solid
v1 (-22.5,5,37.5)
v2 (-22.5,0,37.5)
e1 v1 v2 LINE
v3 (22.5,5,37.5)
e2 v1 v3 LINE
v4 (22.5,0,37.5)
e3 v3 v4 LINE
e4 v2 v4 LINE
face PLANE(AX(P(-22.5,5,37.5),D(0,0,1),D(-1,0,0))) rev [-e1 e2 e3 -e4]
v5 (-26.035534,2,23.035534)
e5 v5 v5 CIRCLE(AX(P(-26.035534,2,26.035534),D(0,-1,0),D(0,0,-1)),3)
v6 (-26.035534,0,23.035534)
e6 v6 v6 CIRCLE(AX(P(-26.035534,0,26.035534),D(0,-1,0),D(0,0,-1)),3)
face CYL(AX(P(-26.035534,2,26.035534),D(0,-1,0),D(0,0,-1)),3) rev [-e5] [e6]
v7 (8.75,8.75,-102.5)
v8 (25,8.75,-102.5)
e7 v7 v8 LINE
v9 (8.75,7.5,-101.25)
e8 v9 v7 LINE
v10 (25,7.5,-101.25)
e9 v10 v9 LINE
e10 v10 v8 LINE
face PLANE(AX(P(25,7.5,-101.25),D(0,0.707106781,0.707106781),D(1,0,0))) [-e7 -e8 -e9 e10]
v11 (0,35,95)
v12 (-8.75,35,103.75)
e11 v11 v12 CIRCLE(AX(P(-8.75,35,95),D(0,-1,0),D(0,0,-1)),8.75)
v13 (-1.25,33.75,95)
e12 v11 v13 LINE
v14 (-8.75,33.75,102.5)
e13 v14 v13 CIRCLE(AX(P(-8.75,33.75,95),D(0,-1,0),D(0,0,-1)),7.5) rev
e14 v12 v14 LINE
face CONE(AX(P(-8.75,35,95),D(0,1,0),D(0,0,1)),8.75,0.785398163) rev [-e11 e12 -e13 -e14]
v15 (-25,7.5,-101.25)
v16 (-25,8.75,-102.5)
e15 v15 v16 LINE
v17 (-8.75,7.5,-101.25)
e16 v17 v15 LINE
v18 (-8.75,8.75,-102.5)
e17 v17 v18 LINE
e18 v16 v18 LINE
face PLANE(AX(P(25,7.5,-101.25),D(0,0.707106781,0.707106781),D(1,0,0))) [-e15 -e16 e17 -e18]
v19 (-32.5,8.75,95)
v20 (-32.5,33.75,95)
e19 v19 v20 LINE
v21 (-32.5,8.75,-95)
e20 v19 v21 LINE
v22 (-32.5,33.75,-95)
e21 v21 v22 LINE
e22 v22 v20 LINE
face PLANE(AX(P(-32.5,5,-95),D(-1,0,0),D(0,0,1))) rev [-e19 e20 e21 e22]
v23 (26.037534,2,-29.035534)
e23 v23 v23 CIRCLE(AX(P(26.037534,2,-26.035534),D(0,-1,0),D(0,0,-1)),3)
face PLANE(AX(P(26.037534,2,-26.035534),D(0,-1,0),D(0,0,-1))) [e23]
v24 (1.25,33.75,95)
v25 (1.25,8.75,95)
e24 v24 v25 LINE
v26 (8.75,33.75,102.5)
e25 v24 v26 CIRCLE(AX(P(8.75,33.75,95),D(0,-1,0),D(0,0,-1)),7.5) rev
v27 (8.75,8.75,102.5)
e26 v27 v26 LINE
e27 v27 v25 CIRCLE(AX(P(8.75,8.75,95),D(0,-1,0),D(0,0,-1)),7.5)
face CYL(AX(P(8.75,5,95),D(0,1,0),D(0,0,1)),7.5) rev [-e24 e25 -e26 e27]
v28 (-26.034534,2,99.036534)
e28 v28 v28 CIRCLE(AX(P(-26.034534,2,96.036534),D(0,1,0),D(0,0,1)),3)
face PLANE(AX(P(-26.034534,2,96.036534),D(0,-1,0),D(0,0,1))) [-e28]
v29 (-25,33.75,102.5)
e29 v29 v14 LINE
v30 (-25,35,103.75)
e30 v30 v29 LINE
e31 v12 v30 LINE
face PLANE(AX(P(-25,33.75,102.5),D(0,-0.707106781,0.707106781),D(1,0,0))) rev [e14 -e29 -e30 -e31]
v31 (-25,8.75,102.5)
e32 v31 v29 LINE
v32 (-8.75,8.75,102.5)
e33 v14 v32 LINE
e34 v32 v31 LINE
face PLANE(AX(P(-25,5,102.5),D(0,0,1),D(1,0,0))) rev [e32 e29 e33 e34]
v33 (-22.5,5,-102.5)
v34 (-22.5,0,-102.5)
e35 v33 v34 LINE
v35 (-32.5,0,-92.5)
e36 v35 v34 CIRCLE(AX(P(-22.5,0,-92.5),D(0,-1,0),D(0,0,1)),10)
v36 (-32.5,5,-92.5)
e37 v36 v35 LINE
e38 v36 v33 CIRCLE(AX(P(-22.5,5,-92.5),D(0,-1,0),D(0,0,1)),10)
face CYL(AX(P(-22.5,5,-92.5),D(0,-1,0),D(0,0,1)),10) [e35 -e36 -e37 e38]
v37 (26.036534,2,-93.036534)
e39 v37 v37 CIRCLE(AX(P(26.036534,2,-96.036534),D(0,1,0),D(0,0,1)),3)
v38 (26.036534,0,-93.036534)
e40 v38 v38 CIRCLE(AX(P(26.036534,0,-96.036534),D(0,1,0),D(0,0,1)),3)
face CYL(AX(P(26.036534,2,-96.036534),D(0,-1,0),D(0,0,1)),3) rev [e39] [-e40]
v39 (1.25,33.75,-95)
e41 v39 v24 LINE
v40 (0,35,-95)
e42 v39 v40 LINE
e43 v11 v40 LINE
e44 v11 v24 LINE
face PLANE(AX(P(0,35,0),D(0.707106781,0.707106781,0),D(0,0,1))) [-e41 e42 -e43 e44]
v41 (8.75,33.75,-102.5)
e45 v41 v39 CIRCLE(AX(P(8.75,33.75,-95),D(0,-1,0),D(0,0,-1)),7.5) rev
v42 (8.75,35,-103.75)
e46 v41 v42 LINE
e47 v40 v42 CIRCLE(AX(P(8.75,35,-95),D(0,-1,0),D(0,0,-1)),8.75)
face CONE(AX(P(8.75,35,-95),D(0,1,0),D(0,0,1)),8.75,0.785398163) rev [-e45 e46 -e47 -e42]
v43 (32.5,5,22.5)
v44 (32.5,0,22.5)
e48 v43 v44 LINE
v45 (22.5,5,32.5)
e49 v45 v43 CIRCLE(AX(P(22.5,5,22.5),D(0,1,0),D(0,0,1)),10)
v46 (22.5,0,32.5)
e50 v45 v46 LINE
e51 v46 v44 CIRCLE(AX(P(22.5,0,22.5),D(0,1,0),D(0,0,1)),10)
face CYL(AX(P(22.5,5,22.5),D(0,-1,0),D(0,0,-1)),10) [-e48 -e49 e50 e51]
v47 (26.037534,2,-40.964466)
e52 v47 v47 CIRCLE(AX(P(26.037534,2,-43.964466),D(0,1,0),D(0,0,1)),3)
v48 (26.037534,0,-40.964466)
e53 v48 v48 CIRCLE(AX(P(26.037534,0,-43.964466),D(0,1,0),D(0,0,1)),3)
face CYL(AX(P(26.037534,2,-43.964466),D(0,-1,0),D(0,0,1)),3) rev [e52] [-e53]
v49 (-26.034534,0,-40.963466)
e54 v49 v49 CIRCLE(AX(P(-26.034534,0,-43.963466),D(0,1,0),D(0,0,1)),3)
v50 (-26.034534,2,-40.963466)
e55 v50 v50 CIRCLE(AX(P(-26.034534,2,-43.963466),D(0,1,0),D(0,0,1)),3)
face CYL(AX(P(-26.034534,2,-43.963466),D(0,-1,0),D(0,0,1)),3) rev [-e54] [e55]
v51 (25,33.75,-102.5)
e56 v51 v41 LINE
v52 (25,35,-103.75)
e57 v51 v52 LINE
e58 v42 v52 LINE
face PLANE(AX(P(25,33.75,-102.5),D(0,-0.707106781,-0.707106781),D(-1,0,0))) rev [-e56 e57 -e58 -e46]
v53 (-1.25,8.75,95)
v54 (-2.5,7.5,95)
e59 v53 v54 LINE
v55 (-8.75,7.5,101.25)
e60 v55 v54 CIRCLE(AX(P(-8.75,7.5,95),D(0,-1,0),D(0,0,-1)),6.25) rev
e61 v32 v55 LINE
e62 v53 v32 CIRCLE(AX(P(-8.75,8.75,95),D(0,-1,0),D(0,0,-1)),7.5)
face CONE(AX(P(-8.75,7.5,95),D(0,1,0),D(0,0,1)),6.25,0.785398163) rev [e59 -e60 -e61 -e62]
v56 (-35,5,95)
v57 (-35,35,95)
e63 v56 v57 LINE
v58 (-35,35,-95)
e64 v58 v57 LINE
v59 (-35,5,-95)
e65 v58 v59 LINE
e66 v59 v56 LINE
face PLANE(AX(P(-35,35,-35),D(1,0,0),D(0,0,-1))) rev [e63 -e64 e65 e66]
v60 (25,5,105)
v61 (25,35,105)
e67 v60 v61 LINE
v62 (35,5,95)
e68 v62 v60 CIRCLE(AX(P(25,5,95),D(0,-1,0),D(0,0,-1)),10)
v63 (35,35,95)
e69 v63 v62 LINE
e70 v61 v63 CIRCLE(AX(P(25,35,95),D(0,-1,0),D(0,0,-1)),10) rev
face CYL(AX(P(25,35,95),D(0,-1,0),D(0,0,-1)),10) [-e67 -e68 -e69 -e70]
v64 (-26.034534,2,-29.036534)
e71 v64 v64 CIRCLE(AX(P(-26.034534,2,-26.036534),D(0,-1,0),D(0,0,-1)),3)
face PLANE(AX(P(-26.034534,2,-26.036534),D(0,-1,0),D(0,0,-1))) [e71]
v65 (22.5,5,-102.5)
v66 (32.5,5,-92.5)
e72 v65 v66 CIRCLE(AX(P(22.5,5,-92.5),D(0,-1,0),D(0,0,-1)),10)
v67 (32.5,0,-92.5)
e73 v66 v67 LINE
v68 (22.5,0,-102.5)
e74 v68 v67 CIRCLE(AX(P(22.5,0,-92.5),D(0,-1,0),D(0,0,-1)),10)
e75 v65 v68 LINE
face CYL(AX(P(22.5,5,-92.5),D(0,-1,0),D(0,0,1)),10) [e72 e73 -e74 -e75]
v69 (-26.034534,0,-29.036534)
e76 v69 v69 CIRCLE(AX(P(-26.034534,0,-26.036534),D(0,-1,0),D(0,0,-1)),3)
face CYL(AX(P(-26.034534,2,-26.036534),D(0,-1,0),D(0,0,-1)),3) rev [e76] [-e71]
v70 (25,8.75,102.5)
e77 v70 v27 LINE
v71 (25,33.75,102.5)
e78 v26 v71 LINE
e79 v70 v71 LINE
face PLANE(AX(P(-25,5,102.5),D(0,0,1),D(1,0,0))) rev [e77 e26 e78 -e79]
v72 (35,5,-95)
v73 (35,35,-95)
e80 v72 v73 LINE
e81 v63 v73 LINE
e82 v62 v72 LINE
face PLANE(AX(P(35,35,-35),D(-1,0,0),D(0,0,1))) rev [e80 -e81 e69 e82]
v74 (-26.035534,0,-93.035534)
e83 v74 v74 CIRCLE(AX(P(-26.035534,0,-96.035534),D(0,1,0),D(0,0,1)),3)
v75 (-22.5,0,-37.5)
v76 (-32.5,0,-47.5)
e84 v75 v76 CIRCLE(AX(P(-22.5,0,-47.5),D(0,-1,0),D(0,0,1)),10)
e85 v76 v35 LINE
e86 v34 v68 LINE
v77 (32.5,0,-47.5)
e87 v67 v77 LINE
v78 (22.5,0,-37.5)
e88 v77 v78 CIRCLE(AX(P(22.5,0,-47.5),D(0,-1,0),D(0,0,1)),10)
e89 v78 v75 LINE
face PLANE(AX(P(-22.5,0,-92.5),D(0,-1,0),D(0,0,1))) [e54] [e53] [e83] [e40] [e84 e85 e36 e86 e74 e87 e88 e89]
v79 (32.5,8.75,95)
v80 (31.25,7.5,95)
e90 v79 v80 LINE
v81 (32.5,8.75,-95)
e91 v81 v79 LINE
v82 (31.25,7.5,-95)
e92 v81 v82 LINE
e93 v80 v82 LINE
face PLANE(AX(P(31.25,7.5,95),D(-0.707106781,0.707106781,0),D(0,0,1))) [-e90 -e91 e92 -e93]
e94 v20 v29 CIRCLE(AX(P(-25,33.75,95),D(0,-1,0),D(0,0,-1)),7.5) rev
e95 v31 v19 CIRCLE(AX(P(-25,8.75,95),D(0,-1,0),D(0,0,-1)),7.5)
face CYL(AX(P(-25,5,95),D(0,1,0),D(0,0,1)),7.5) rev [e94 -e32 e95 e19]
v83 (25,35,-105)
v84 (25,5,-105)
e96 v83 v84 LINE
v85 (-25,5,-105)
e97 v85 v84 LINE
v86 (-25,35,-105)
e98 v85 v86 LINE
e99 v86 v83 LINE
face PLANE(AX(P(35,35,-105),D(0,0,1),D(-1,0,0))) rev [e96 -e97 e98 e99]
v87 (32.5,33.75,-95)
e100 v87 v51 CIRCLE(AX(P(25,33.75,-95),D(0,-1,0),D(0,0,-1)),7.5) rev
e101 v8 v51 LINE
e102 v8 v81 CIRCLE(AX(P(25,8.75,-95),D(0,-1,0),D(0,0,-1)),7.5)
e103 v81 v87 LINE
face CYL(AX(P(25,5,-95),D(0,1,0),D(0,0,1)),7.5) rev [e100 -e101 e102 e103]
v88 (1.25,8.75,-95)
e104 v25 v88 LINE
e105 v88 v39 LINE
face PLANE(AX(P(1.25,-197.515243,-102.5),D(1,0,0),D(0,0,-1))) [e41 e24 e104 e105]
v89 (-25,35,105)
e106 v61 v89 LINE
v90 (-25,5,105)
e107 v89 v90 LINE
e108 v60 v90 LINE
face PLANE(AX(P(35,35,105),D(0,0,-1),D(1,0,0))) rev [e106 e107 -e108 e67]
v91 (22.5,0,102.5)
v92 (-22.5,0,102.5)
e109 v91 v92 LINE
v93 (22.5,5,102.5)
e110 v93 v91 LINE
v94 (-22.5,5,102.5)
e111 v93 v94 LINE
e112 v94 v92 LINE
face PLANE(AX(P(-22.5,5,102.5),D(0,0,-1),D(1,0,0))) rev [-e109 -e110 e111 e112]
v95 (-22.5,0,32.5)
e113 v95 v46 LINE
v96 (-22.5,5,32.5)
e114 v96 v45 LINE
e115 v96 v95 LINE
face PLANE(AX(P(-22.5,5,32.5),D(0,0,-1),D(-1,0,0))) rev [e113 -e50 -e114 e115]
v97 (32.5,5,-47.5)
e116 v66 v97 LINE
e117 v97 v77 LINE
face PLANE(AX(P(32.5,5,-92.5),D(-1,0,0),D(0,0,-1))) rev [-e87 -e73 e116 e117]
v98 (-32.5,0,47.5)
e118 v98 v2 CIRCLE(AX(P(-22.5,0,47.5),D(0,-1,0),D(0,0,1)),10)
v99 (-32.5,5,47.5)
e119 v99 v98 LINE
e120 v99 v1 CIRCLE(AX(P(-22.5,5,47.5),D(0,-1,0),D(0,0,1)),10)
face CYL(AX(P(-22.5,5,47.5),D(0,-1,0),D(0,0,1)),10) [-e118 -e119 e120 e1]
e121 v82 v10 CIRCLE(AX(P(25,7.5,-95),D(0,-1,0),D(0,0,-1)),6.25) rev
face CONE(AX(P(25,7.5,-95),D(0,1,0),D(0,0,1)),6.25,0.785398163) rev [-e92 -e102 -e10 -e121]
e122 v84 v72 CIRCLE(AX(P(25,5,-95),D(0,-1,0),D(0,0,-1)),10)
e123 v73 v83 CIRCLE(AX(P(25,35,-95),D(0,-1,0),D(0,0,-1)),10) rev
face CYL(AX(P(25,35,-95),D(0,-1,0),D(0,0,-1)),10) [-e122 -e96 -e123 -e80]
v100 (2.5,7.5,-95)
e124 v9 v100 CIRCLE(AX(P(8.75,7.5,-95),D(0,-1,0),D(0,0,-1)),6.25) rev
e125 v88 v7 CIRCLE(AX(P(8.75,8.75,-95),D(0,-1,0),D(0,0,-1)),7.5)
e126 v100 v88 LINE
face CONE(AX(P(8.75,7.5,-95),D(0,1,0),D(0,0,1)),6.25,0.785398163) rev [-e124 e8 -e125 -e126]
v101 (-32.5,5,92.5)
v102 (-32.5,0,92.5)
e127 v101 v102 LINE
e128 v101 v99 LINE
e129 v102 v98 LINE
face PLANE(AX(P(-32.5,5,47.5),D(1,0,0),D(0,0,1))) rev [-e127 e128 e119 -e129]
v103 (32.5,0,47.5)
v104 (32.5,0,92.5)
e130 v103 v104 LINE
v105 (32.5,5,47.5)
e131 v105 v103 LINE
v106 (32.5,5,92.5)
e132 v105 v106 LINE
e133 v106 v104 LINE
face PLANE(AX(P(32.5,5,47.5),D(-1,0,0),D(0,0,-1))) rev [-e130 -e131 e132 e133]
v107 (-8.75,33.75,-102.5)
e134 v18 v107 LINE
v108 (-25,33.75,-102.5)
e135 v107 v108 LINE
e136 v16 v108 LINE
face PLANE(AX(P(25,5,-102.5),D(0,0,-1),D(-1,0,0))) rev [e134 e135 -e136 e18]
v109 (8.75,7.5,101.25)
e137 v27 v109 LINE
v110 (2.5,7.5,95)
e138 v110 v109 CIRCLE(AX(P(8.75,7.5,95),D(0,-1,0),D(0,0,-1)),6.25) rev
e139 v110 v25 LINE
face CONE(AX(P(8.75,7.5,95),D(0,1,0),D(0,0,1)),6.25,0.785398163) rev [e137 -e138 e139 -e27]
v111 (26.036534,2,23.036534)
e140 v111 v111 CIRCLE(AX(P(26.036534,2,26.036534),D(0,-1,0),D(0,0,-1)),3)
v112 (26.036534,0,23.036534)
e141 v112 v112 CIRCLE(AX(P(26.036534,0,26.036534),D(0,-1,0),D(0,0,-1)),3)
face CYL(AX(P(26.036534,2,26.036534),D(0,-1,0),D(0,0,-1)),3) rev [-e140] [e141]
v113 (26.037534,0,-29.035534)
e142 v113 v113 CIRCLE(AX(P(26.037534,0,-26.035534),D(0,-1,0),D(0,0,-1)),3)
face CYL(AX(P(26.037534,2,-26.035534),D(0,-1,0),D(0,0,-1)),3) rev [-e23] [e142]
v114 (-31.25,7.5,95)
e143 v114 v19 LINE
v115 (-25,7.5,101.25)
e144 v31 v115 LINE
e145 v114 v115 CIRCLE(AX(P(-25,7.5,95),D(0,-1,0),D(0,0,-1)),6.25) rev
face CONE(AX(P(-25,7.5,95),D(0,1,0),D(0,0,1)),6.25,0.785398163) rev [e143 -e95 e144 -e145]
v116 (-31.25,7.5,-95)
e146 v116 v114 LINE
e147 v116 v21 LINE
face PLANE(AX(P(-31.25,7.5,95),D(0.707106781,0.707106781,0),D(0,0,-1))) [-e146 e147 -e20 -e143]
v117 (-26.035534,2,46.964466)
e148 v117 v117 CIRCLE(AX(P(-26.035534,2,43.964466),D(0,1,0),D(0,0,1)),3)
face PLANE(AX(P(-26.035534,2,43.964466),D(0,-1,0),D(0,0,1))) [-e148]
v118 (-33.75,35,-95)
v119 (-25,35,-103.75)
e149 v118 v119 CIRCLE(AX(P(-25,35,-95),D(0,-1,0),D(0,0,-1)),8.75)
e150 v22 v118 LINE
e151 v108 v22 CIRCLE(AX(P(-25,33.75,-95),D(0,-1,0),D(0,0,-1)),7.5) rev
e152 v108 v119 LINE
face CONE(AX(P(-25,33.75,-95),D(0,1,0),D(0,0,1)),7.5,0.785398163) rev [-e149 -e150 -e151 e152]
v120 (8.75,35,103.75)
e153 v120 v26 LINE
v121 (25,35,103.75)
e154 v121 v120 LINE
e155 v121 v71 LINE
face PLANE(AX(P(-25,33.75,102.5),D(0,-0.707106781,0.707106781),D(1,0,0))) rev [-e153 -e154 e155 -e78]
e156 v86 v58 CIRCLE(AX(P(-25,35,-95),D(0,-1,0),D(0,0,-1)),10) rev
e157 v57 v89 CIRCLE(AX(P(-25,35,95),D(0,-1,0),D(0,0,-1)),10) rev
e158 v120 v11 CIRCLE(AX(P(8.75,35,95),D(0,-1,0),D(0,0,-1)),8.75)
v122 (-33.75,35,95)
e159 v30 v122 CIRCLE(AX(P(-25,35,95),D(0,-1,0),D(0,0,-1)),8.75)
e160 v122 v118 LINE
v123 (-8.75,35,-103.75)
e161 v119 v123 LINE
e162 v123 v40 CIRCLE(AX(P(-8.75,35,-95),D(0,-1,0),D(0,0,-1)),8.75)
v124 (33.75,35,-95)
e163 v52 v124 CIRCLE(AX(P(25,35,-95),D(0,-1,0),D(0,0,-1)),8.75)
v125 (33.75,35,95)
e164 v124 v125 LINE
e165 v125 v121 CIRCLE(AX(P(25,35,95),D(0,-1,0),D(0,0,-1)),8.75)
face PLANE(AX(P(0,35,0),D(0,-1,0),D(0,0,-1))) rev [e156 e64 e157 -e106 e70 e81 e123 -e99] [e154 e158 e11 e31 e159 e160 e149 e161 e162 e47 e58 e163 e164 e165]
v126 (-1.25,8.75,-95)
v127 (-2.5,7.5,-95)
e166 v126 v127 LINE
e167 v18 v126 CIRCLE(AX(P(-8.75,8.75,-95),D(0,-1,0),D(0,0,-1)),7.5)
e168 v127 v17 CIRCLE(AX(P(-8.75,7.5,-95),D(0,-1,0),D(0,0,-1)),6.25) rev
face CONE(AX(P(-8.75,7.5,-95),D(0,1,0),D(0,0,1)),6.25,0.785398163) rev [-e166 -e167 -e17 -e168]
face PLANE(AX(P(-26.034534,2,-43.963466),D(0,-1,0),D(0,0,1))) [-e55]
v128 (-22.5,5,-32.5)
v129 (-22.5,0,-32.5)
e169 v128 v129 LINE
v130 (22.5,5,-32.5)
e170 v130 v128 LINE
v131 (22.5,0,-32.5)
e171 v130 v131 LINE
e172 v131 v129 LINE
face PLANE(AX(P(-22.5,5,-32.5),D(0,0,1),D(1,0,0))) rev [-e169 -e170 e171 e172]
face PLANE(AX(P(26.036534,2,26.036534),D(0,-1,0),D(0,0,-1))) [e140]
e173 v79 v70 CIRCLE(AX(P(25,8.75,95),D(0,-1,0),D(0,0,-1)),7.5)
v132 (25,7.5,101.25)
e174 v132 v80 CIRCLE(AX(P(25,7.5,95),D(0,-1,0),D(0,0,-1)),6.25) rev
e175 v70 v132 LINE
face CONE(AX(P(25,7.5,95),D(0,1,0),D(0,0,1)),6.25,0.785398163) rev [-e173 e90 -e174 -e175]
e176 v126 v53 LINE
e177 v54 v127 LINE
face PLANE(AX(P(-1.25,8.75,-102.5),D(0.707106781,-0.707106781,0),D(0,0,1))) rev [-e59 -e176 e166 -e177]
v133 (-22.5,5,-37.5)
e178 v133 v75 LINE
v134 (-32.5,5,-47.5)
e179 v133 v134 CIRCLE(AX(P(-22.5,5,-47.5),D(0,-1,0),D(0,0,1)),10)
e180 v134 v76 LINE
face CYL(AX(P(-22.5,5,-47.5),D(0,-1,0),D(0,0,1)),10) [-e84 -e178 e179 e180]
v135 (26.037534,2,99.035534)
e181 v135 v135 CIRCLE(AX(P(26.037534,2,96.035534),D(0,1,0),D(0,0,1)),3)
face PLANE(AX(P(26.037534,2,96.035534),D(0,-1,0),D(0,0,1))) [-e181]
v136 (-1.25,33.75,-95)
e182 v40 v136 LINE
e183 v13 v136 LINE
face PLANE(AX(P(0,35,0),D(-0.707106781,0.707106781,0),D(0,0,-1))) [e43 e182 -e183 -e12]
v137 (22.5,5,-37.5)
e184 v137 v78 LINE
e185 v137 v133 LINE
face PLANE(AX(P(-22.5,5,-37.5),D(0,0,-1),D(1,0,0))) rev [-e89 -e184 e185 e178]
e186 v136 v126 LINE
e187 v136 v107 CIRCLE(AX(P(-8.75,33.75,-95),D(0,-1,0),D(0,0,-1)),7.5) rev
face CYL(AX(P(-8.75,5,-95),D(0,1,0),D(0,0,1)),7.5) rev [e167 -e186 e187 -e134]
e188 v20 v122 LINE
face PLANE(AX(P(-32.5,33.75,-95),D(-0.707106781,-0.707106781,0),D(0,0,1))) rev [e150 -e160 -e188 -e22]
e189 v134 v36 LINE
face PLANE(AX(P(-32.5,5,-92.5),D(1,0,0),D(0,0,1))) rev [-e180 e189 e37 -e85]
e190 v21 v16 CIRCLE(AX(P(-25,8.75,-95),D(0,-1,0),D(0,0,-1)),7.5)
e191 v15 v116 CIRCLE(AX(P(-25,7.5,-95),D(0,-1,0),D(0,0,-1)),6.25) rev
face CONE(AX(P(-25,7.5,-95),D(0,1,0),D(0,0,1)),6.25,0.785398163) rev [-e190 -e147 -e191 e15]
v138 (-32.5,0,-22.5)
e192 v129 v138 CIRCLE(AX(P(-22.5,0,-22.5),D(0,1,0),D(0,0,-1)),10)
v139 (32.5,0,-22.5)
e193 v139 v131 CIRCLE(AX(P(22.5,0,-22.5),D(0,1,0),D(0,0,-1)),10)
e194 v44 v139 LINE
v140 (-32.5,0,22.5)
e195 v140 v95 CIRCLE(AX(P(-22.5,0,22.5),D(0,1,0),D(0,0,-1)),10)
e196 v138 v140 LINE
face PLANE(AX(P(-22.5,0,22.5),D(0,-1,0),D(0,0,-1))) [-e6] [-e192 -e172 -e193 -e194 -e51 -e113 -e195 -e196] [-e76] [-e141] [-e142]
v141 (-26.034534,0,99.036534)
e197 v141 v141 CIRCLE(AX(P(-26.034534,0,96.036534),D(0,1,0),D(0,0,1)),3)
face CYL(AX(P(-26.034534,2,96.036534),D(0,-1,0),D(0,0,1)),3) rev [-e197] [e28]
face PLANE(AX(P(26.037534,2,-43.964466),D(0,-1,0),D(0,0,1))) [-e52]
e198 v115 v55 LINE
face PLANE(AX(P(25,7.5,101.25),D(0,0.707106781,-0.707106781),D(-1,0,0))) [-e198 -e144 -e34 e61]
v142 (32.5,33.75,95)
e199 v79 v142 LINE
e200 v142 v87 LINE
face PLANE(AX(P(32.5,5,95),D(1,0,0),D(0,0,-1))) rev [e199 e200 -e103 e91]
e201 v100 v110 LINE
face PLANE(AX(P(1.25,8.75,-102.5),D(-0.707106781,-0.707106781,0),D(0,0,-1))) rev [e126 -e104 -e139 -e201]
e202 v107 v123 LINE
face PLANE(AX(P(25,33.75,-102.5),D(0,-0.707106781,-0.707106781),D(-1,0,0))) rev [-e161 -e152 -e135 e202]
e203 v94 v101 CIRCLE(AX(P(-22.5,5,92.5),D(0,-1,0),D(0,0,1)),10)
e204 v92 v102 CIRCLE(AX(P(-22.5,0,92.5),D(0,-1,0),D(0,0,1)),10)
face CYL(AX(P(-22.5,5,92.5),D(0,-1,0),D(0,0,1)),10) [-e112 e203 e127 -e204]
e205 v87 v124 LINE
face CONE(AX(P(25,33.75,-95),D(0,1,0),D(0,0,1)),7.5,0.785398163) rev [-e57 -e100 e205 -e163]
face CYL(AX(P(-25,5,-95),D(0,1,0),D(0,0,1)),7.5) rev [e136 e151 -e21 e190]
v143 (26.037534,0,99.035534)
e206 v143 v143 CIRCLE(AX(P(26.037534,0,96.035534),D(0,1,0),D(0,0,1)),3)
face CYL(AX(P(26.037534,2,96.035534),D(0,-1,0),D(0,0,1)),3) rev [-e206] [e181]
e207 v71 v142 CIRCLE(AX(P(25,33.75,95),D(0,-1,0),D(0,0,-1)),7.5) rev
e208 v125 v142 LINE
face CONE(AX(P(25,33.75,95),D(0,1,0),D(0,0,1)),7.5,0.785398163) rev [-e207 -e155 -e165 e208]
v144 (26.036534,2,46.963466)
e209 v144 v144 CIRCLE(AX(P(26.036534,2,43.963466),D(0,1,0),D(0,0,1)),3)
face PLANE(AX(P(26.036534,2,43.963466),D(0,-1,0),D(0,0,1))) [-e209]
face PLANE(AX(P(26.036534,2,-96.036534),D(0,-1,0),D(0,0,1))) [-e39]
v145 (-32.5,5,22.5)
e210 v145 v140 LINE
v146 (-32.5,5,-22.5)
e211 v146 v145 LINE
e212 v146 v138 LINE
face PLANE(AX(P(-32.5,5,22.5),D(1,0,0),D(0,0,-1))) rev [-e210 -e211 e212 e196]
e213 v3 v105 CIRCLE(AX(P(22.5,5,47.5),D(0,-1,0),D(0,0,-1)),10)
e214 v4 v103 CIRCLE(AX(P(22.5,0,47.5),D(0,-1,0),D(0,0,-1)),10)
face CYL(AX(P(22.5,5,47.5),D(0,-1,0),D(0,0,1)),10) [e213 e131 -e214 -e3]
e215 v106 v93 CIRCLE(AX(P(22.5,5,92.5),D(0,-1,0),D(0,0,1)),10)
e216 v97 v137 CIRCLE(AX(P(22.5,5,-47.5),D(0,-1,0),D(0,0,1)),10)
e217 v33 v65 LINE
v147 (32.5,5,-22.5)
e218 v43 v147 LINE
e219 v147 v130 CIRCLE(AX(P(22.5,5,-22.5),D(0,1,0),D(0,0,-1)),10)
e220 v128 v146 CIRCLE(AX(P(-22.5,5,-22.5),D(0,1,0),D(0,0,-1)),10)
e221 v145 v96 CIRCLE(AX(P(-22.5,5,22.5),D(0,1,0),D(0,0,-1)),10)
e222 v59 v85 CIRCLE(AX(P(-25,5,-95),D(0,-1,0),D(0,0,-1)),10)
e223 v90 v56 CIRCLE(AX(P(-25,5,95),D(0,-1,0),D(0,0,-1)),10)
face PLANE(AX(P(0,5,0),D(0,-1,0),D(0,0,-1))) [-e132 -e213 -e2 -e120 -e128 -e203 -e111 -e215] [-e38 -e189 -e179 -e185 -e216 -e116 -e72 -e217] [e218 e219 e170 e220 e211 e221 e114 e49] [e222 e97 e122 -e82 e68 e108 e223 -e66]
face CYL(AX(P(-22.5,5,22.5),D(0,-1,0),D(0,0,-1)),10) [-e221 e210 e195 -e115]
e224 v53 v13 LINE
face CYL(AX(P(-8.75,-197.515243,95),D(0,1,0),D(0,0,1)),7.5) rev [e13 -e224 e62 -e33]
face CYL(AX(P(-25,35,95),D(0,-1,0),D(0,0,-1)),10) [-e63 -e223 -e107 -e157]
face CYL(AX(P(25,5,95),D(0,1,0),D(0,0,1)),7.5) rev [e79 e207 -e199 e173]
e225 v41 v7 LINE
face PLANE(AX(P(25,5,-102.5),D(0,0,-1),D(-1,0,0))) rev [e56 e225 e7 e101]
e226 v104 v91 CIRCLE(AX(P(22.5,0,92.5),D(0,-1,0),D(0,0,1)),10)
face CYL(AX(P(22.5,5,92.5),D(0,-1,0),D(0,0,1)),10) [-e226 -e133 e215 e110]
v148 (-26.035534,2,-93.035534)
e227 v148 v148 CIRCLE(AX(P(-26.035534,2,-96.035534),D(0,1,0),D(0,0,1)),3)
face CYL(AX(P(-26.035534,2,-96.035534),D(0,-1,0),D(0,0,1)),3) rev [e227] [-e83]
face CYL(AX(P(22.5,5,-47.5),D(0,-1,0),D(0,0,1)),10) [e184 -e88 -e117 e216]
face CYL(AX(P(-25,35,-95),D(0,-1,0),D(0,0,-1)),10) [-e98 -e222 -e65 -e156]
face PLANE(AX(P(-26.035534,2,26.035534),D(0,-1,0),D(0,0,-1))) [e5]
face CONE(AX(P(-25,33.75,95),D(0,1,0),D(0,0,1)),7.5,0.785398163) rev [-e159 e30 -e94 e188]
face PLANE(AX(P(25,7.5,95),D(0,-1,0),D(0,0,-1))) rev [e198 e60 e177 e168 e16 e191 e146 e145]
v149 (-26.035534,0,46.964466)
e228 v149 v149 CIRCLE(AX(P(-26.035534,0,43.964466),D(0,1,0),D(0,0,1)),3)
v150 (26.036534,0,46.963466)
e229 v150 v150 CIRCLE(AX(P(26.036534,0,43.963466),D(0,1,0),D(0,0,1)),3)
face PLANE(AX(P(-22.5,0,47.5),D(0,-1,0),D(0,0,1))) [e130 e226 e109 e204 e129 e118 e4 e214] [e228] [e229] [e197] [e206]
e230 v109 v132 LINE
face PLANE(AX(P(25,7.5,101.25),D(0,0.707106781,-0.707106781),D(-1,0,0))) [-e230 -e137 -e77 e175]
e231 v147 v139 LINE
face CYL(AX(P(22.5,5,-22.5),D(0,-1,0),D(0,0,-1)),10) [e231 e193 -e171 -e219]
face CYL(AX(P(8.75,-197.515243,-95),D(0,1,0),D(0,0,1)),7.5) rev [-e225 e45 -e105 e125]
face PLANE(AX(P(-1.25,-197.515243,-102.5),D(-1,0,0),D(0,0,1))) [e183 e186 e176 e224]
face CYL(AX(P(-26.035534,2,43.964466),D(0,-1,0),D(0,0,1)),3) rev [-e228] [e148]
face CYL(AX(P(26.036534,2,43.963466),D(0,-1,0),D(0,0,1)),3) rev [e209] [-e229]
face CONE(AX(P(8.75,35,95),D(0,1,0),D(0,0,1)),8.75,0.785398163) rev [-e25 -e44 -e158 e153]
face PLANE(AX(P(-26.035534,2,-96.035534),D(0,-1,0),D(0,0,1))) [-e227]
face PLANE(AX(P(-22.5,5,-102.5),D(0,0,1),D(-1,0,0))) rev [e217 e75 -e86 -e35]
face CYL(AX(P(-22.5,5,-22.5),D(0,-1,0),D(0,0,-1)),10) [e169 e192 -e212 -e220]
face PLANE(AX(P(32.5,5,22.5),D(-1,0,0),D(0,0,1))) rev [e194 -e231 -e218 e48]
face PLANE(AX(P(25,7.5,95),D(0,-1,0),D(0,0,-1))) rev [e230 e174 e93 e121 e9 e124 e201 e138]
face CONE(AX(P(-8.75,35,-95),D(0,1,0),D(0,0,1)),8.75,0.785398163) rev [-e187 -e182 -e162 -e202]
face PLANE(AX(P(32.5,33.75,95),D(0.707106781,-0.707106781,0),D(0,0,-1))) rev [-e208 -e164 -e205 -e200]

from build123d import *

# Parameters (mm, degrees)
BOSS_EXTRUDE4_DEPTH = 5
SKETCH7_R           = 3
CUT_EXTRUDE4_DEPTH  = 2
SKETCH8_W           = 70
SKETCH8_H           = 70
BOSS_EXTRUDE5_DEPTH = 30
MIRROR2_START       = 5
MIRROR2_OUTLINE_W   = 70
MIRROR2_OUTLINE_H   = 70
MIRROR2_DEPTH       = 30
MIRROR2_2_OUTLINE_R = 3
MIRROR2_2_DEPTH     = 5
MIRROR2_START_2     = 2
MIRROR2_3_OUTLINE_R = 3
MIRROR2_3_DEPTH     = 3
FILLET1_R           = 10
CUT_EXTRUDE5_DEPTH  = 30
BOSS_EXTRUDE6_DEPTH = 2.5
BOSS_EXTRUDE7_DEPTH = 27.5
FILLET2_R           = 7.5
CHAMFER1_SIZE       = 1.25


# Read off the part's stored shape, not the designer's step: Mirror2
with BuildPart() as part:
    # Sketch5 → Boss-Extrude4 (new body)
    with BuildSketch(Plane(origin=(0, 0, 0), x_dir=(1, 0, 0), z_dir=(0, 1, 0))):
        with BuildLine():
            Line((-22.5, -32.5), (22.5, -32.5))
            ThreePointArc((22.5, -32.5), (29.571067812, -29.571067812), (32.5, -22.5))
            Line((32.5, -22.5), (32.5, 22.5))
            ThreePointArc((32.5, 22.5), (29.571067812, 29.571067812), (22.5, 32.5))
            Line((22.5, 32.5), (-22.5, 32.5))
            ThreePointArc((-22.5, 32.5), (-29.571067812, 29.571067812), (-32.5, 22.5))
            Line((-32.5, 22.5), (-32.5, -22.5))
            ThreePointArc((-32.5, -22.5), (-29.571067812, -29.571067812), (-22.5, -32.5))
        make_face()
    extrude(amount=BOSS_EXTRUDE4_DEPTH)

    # Sketch7 → Cut-Extrude4 (cut)
    with BuildSketch(Plane.XZ):
        with Locations(Location((-26.035533906, 26.035533906, 0), (0, 0, 270))):
            Circle(SKETCH7_R)
        with Locations(Location((26.036533906, 26.036533906, 0), (0, 0, 270))):
            Circle(SKETCH7_R)
        with Locations(Location((26.037533906, -26.035533906, 0), (0, 0, 270))):
            Circle(SKETCH7_R)
        with Locations(Location((-26.034533906, -26.036533906, 0), (0, 0, 270))):
            Circle(SKETCH7_R)
    extrude(amount=-CUT_EXTRUDE4_DEPTH, mode=Mode.SUBTRACT)

    # Sketch8 → Boss-Extrude5 (add)
    with BuildSketch(Plane(origin=(0, 5, 0), x_dir=(1, 0, 0), z_dir=(0, 1, 0))):
        Rectangle(SKETCH8_W, SKETCH8_H)
    extrude(amount=BOSS_EXTRUDE5_DEPTH)

    # Mirror2 outline → Mirror2 (add)
    with BuildSketch(Plane(origin=(0, 0, 0), x_dir=(1, 0, 0), z_dir=(0, 1, 0)).offset(MIRROR2_START)):
        with Locations((0, -70)):
            Rectangle(MIRROR2_OUTLINE_W, MIRROR2_OUTLINE_H)
        with Locations((0, 70)):
            Rectangle(MIRROR2_OUTLINE_W, MIRROR2_OUTLINE_H)
    extrude(amount=MIRROR2_DEPTH)

    # Mirror2 2 outline → Mirror2 2 (add)
    # profile 1 of 2: a face of its own
    with BuildSketch(Plane(origin=(0, 0, 0), x_dir=(1, 0, 0), z_dir=(0, 1, 0))):
        with BuildLine():
            Line((32.5, -92.5), (32.5, -47.5))
            ThreePointArc((32.5, -47.5), (29.571067812, -40.428932188), (22.5, -37.5))
            Line((22.5, -37.5), (-22.5, -37.5))
            ThreePointArc((-22.5, -37.5), (-29.571067812, -40.428932188), (-32.5, -47.5))
            Line((-32.5, -47.5), (-32.5, -92.5))
            ThreePointArc((-32.5, -92.5), (-29.571067812, -99.571067812), (-22.5, -102.5))
            Line((-22.5, -102.5), (22.5, -102.5))
            ThreePointArc((22.5, -102.5), (29.571067812, -99.571067812), (32.5, -92.5))
        make_face()
        with Locations((-26.034533906, -96.036533906)):
            Circle(MIRROR2_2_OUTLINE_R, mode=Mode.SUBTRACT)
        with Locations((-26.035533906, -43.964466094)):
            Circle(MIRROR2_2_OUTLINE_R, mode=Mode.SUBTRACT)
        with Locations((26.037533906, -96.035533906)):
            Circle(MIRROR2_2_OUTLINE_R, mode=Mode.SUBTRACT)
        with Locations((26.036533906, -43.963466094)):
            Circle(MIRROR2_2_OUTLINE_R, mode=Mode.SUBTRACT)
    # profile 2 of 2: a face of its own
    with BuildSketch(Plane(origin=(0, 0, 0), x_dir=(1, 0, 0), z_dir=(0, 1, 0))):
        with BuildLine():
            Line((32.5, 47.5), (32.5, 92.5))
            ThreePointArc((32.5, 92.5), (29.571067812, 99.571067812), (22.5, 102.5))
            Line((22.5, 102.5), (-22.5, 102.5))
            ThreePointArc((-22.5, 102.5), (-29.571067812, 99.571067812), (-32.5, 92.5))
            Line((-32.5, 92.5), (-32.5, 47.5))
            ThreePointArc((-32.5, 47.5), (-29.571067812, 40.428932188), (-22.5, 37.5))
            Line((-22.5, 37.5), (22.5, 37.5))
            ThreePointArc((22.5, 37.5), (29.571067812, 40.428932188), (32.5, 47.5))
        make_face()
        with Locations((-26.034533906, 43.963466094)):
            Circle(MIRROR2_2_OUTLINE_R, mode=Mode.SUBTRACT)
        with Locations((-26.035533906, 96.035533906)):
            Circle(MIRROR2_2_OUTLINE_R, mode=Mode.SUBTRACT)
        with Locations((26.037533906, 43.964466094)):
            Circle(MIRROR2_2_OUTLINE_R, mode=Mode.SUBTRACT)
        with Locations((26.036533906, 96.036533906)):
            Circle(MIRROR2_2_OUTLINE_R, mode=Mode.SUBTRACT)
    extrude(amount=MIRROR2_2_DEPTH)

    # Mirror2 3 outline → Mirror2 3 (add)
    with BuildSketch(Plane(origin=(0, 0, 0), x_dir=(1, 0, 0), z_dir=(0, 1, 0)).offset(MIRROR2_START_2)):
        with Locations((-26.035533906, -43.964466094)):
            Circle(MIRROR2_3_OUTLINE_R)
        with Locations((26.036533906, -43.963466094)):
            Circle(MIRROR2_3_OUTLINE_R)
        with Locations((26.037533906, -96.035533906)):
            Circle(MIRROR2_3_OUTLINE_R)
        with Locations((-26.034533906, -96.036533906)):
            Circle(MIRROR2_3_OUTLINE_R)
        with Locations((-26.035533906, 96.035533906)):
            Circle(MIRROR2_3_OUTLINE_R)
        with Locations((26.036533906, 96.036533906)):
            Circle(MIRROR2_3_OUTLINE_R)
        with Locations((26.037533906, 43.964466094)):
            Circle(MIRROR2_3_OUTLINE_R)
        with Locations((-26.034533906, 43.963466094)):
            Circle(MIRROR2_3_OUTLINE_R)
    extrude(amount=MIRROR2_3_DEPTH)

    # Fillet1
    fillet1_edges = [part.edges().sort_by_distance(p)[0] for p in [
        (35, 20, 105),
        (-35, 20, 105),
        (-35, 20, -105),
        (35, 20, -105),
    ]]
    fillet(fillet1_edges, radius=FILLET1_R)

    # Sketch9 → Cut-Extrude5 (cut)
    with BuildSketch(Plane(origin=(0, 35, 0), x_dir=(1, 0, 0), z_dir=(0, 1, 0))):
        with BuildLine():
            Line((-32.5, 95), (-32.5, -95))
            ThreePointArc((-32.5, -95), (-30.303300859, -100.303300859), (-25, -102.5))
            Line((-25, -102.5), (25, -102.5))
            ThreePointArc((25, -102.5), (30.303300859, -100.303300859), (32.5, -95))
            Line((32.5, -95), (32.5, 95))
            ThreePointArc((32.5, 95), (30.303300859, 100.303300859), (25, 102.5))
            Line((25, 102.5), (-25, 102.5))
            ThreePointArc((-25, 102.5), (-30.303300859, 100.303300859), (-32.5, 95))
        make_face()
    extrude(amount=-CUT_EXTRUDE5_DEPTH, mode=Mode.SUBTRACT)


with BuildPart() as cut_extrude5_piece_1:
    # of the separate pieces the step leaves, piece 1, a body of its own (cut_extrude5_pieces)
    add(part.part.solids().sort_by_distance((35, 5, 95))[0])



with BuildPart() as cut_extrude5_piece_2:
    # of the separate pieces the step leaves, piece 2, a body of its own (cut_extrude5_pieces)
    add(part.part.solids().sort_by_distance((32.5, 0, 92.5))[0])


with BuildPart() as cut_extrude5_piece_3:
    # of the separate pieces the step leaves, piece 3, a body of its own (cut_extrude5_pieces)
    add(part.part.solids().sort_by_distance((32.5, 0, -47.5))[0])


with BuildPart() as cut_extrude5_piece_4:
    # of the separate pieces the step leaves, piece 4, a body of its own (cut_extrude5_pieces)
    add(part.part.solids().sort_by_distance((32.5, 0, 22.5))[0])


with BuildPart() as cut_extrude5_piece_1_1:
    add(cut_extrude5_piece_1.part)

    add(cut_extrude5_piece_2.part)  # Boss-Extrude6 merges Cut-Extrude5 piece 2

    add(cut_extrude5_piece_3.part)  # Boss-Extrude6 merges Cut-Extrude5 piece 3

    add(cut_extrude5_piece_4.part)  # Boss-Extrude6 merges Cut-Extrude5 piece 4
    # Sketch10 → Boss-Extrude6 (add)
    with BuildSketch(Plane.XZ.offset(-5)):
        with BuildLine():
            Line((25, 105), (-25, 105))
            ThreePointArc((-25, 105), (-32.071067812, 102.071067812), (-35, 95))
            Line((-35, 95), (-35, -95))
            ThreePointArc((-35, -95), (-32.071067812, -102.071067812), (-25, -105))
            Line((-25, -105), (25, -105))
            ThreePointArc((25, -105), (32.071067812, -102.071067812), (35, -95))
            Line((35, -95), (35, 95))
            ThreePointArc((35, 95), (32.071067812, 102.071067812), (25, 105))
        make_face()
    extrude(amount=-BOSS_EXTRUDE6_DEPTH)

    # Sketch11 → Boss-Extrude7 (add)
    with BuildSketch(Plane(origin=(0, 35, 0), x_dir=(1, 0, 0), z_dir=(0, 1, 0))):
        Polygon((-1.25, -102.5), (1.25, -102.5), (1.25, 102.5), (0, 102.5), (-1.25, 102.5), align=None)
    extrude(amount=-BOSS_EXTRUDE7_DEPTH)

    # Fillet2
    fillet2_edges = [cut_extrude5_piece_1_1.edges().sort_by_distance(p)[0] for p in [
        (-1.25, 21.25, 102.5),
        (1.25, 21.25, 102.5),
        (1.25, 21.25, -102.5),
        (-1.25, 21.25, -102.5),
    ]]
    fillet(fillet2_edges, radius=FILLET2_R)

    # Chamfer1
    chamfer1_edges = [cut_extrude5_piece_1_1.edges().sort_by_distance(p)[0] for p in [
        (-16.875, 35, 102.5),
        (-32.5, 35, 0),
        (-30.303300859, 35, 100.303300859),
        (30.303300859, 35, 100.303300859),
        (30.303300859, 35, -100.303300859),
        (-30.303300859, 35, -100.303300859),
        (1.25, 7.5, 0),
        (1.25, 35, 0),
        (16.875, 7.5, 102.5),
        (3.446699141, 7.5, 100.303300859),
        (3.446699141, 7.5, -100.303300859),
        (16.875, 35, 102.5),
        (-1.25, 7.5, 0),
        (-1.25, 35, 0),
        (-16.875, 7.5, -102.5),
        (-3.446699141, 7.5, -100.303300859),
        (-3.446699141, 7.5, 100.303300859),
        (-16.875, 35, -102.5),
        (3.446699141, 35, -100.303300859),
        (3.446699141, 35, 100.303300859),
        (-3.446699141, 35, 100.303300859),
        (-3.446699141, 35, -100.303300859),
        (-30.303300859, 7.5, -100.303300859),
        (-16.875, 7.5, 102.5),
        (30.303300859, 7.5, 100.303300859),
        (32.5, 7.5, 0),
        (30.303300859, 7.5, -100.303300859),
        (16.875, 7.5, -102.5),
        (-32.5, 7.5, 0),
        (-30.303300859, 7.5, 100.303300859),
        (16.875, 35, -102.5),
        (32.5, 35, 0),
    ]]
    chamfer(chamfer1_edges, length=CHAMFER1_SIZE - 0.0001)  # a hair under: the kernel refuses the full size


solid = cut_extrude5_piece_1_1.part
